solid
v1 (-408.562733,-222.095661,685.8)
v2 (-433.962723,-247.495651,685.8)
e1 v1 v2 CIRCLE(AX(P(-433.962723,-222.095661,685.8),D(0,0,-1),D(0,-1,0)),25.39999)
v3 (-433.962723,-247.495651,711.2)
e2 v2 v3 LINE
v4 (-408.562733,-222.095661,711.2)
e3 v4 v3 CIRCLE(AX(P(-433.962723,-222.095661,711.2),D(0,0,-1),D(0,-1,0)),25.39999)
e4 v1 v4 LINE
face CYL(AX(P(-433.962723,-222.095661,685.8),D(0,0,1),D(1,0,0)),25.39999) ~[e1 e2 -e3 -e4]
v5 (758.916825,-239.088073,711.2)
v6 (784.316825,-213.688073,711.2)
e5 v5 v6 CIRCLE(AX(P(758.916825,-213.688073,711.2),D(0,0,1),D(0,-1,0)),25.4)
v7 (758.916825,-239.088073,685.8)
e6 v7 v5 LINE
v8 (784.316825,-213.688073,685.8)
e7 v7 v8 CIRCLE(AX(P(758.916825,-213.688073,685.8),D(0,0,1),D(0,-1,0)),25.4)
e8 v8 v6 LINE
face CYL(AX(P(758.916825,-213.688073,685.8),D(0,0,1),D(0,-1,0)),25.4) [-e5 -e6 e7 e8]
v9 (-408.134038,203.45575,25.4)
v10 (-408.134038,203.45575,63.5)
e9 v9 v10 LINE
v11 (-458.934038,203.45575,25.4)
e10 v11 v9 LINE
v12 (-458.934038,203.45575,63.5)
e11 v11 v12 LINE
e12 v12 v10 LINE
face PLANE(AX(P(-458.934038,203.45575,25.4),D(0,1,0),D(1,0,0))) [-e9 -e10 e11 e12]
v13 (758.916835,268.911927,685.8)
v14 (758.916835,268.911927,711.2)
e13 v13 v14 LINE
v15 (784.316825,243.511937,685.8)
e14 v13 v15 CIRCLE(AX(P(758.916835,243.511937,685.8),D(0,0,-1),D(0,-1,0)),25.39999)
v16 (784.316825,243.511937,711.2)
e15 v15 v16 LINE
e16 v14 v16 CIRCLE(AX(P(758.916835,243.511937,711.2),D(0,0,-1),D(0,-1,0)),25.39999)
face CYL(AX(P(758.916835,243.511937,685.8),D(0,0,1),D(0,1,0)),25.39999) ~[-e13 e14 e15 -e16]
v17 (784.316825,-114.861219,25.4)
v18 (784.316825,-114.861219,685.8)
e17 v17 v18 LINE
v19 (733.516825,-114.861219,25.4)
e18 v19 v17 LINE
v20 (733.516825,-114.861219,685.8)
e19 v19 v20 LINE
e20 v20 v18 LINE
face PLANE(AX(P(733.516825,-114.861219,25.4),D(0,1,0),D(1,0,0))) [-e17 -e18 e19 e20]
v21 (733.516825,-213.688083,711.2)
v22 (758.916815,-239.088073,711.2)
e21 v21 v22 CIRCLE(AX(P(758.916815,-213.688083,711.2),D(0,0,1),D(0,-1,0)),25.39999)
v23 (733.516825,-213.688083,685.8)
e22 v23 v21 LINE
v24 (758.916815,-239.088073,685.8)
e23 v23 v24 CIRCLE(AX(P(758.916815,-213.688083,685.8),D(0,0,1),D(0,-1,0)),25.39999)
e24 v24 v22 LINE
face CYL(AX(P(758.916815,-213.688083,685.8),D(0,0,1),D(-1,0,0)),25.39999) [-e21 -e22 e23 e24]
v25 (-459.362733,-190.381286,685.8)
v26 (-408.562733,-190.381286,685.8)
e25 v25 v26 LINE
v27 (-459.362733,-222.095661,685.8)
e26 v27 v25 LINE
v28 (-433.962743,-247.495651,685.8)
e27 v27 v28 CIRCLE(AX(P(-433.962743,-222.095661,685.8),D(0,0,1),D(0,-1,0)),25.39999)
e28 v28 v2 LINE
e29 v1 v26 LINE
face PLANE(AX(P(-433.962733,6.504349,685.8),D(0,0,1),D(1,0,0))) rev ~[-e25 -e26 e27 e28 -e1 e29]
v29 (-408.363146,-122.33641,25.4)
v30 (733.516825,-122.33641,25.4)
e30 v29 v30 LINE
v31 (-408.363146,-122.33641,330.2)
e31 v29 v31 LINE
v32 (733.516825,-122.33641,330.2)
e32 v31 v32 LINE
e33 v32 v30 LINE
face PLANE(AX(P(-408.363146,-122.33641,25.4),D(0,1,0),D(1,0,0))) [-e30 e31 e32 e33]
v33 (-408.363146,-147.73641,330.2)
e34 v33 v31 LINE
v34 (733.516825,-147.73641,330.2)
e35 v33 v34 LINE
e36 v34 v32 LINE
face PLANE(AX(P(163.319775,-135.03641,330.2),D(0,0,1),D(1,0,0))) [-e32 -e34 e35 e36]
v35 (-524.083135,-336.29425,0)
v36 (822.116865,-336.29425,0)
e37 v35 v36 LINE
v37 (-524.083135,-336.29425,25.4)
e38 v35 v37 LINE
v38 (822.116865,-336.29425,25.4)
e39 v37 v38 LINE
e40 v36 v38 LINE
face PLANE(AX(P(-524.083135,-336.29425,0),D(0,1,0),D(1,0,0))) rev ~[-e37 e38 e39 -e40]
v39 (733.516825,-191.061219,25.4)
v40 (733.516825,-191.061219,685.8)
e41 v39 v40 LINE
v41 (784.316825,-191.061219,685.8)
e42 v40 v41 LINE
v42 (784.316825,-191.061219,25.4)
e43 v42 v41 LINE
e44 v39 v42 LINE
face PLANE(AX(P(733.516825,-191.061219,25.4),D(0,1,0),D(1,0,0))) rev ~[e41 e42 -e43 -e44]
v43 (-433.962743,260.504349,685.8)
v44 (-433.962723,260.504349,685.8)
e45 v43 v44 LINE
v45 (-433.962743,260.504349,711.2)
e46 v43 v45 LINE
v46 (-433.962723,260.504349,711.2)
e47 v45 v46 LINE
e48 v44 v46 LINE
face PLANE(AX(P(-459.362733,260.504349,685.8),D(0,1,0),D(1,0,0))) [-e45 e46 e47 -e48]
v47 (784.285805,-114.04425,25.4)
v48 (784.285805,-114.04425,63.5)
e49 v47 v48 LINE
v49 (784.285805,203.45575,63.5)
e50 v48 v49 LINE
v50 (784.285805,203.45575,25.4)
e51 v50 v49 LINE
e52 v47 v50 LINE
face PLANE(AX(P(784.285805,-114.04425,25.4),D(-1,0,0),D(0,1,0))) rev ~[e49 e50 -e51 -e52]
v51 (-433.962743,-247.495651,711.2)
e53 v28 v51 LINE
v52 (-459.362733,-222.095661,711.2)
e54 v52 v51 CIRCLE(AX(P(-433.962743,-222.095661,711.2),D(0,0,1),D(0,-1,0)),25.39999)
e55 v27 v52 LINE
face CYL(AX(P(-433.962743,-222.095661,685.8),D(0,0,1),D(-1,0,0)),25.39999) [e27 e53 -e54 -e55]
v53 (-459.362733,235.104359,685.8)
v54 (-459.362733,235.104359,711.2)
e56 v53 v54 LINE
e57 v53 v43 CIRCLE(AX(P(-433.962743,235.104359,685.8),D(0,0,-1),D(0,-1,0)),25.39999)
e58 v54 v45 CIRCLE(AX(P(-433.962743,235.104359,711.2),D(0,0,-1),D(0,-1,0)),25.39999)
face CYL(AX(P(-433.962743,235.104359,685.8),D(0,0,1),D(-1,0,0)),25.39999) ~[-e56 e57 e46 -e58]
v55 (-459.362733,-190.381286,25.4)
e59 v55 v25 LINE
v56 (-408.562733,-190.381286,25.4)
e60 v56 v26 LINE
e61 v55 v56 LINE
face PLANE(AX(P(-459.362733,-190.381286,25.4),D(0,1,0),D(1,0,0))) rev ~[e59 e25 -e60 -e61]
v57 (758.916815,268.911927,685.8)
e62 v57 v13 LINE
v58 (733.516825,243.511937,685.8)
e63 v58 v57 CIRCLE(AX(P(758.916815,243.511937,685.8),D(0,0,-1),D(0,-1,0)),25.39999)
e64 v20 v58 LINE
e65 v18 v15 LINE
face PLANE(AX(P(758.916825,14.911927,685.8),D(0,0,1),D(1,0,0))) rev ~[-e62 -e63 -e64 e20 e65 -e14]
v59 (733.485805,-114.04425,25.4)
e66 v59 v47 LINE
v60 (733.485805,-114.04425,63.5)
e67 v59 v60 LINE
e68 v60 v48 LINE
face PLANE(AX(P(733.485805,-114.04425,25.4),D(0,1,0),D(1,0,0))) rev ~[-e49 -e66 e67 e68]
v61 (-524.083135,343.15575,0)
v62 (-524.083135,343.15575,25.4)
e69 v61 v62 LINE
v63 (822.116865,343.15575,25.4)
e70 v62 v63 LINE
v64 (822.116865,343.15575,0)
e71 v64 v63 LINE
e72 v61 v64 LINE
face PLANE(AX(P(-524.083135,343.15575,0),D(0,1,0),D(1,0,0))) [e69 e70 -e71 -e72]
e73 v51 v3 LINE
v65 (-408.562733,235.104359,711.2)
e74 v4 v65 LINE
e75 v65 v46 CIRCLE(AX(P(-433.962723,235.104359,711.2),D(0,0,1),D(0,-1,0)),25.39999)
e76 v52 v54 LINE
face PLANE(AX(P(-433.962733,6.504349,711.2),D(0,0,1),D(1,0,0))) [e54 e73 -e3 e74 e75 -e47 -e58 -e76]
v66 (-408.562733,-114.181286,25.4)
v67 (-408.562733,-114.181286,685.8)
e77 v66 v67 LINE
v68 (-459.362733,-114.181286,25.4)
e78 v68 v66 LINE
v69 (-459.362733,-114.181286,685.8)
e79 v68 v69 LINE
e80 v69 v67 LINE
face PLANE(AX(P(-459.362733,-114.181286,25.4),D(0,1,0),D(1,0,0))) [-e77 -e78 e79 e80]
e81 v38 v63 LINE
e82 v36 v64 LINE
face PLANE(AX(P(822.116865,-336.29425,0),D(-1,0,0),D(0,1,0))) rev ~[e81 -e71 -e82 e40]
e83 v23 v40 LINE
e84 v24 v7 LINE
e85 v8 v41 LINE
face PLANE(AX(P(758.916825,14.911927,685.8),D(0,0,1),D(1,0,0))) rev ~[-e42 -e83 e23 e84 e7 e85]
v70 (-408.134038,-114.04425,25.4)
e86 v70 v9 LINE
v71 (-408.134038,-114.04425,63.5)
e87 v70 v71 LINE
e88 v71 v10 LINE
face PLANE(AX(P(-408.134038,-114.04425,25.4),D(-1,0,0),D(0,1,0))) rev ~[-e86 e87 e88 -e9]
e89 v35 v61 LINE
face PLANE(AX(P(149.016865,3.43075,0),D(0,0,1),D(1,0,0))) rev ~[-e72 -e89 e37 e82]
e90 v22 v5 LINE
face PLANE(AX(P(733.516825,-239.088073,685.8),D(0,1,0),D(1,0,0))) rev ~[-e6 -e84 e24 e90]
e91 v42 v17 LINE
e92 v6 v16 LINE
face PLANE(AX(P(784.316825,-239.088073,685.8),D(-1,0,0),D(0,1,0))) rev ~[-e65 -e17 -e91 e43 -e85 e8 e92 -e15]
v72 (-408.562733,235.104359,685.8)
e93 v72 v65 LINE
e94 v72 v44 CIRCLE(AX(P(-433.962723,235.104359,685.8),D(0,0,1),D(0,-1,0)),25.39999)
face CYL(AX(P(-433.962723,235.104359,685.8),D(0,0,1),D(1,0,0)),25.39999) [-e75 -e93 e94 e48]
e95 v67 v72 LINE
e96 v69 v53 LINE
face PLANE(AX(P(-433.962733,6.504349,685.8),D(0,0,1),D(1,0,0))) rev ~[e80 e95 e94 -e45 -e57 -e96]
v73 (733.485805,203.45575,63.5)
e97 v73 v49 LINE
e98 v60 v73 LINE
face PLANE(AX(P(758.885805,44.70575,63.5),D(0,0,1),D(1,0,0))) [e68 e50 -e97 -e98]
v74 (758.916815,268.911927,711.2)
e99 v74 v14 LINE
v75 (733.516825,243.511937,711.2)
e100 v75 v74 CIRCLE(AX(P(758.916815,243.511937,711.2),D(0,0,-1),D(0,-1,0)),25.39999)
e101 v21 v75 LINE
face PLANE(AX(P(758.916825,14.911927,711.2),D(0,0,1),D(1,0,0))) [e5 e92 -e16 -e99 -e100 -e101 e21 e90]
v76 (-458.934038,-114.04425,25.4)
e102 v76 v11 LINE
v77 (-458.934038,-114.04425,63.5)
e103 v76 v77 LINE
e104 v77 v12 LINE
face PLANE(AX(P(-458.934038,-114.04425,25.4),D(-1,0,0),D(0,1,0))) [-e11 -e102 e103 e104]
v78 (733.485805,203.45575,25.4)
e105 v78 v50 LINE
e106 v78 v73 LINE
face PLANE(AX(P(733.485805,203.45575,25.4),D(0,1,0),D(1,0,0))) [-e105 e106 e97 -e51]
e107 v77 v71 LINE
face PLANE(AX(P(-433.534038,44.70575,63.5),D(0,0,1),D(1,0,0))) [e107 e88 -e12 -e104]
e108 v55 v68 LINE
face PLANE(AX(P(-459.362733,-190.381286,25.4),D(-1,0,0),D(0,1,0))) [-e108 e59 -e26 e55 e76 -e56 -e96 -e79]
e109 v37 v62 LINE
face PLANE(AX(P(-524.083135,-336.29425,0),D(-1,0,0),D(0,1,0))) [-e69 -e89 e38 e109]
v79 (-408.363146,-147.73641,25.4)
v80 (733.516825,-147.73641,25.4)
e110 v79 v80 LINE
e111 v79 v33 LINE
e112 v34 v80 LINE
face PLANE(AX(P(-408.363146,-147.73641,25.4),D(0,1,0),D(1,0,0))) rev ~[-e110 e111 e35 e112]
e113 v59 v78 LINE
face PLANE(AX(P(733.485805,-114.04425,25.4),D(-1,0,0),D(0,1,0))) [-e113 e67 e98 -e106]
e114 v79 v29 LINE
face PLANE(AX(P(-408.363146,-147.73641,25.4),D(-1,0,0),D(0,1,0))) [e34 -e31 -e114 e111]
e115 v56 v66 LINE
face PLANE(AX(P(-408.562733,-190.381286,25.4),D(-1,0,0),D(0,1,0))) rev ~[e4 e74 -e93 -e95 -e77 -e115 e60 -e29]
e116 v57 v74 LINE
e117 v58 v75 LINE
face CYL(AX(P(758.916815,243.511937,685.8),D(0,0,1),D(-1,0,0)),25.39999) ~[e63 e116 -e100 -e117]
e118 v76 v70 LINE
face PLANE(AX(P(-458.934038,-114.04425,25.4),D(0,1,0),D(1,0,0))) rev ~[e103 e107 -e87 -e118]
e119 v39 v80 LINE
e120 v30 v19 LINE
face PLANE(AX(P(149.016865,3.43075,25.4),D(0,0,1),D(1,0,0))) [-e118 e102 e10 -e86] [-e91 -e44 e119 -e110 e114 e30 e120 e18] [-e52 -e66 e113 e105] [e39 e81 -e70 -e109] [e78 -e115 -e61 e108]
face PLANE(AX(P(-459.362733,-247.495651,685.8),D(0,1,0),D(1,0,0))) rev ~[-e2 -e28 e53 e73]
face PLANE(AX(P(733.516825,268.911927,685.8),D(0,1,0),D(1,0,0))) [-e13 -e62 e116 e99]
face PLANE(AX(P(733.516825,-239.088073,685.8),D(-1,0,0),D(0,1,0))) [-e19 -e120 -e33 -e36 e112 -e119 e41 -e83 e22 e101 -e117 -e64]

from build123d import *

# Parameters (mm, degrees)
F0_W      = 1346.2
F0_H      = 679.45
F1_DEPTH  = 25.4
F3_W      = 50.8
F3_H      = 317.5
F4_W      = 50.8
F4_H      = 317.5
F5_DEPTH  = 38.1
F7_W      = 50.8
F7_H      = 76.2
F6_W      = 50.8
F6_H      = 76.2
F8_DEPTH  = 660.4
F10_W     = 50.8
F10_H     = 508
F9_W      = 50.8
F9_H      = 508
F11_DEPTH = 25.4
F12_R     = 25.39999
F13_R     = 25.4
F14_W     = 1143.3658423165
F14_H     = 25.4
F15_DEPTH = 304.8


# Not quite as in the source:
# - a fillet or chamfer is up to 0.001 mm smaller than in the source, because OpenCascade refuses the exact size


with BuildPart() as f1:
    # F0 (on Top) → F1 (new body)
    with BuildSketch(Plane.XY):
        with Locations((149.0168645364, 3.430750221)):
            Rectangle(F0_W, F0_H)
    extrude(amount=F1_DEPTH)

    # F3 (on face) + F4 (on face) → F5 (join)
    with BuildSketch(Plane.XY.offset(25.4)):
        with Locations((-433.5340384189, 44.705750221)):
            Rectangle(F3_W, F3_H)
    with BuildSketch(Plane.XY.offset(25.4)):
        with Locations((758.8858046625, 44.705750221)):
            Rectangle(F4_W, F4_H)
    extrude(amount=F5_DEPTH)

    # F7 (on face) + F6 (on face) → F8 (join)
    with BuildSketch(Plane.XY.offset(25.4)):
        with Locations((-433.9627325535, -152.2812862285)):
            Rectangle(F7_W, F7_H)
    with BuildSketch(Plane.XY.offset(25.4)):
        with Locations((758.9168250561, -152.9612190686)):
            Rectangle(F6_W, F6_H)
    extrude(amount=F8_DEPTH)

    # F10 (on face) + F9 (on face) → F11 (join)
    with BuildSketch(Plane.XY.offset(685.8)):
        with Locations((758.9168250561, 14.9119266272)):
            Rectangle(F10_W, F10_H)
    with BuildSketch(Plane.XY.offset(685.8)):
        with Locations((-433.9627325535, 6.5043487549)):
            Rectangle(F9_W, F9_H)
    extrude(amount=F11_DEPTH)

    # F12 (radius 25.4 in the source; OpenCascade refuses exactly that, so slightly less here)
    f12_edges = [f1.edges().sort_by_distance(p)[0] for p in [
        (-459.362733, 260.504349, 698.5),
        (-408.562733, 260.504349, 698.5),
        (733.516825, 268.911927, 698.5),
        (784.316825, 268.911927, 698.5),
        (-459.362733, -247.495651, 698.5),
        (-408.562733, -247.495651, 698.5),
        (733.516825, -239.088073, 698.5),
    ]]
    fillet(f12_edges, radius=F12_R)

    # F13
    f13_edges = [f1.edges().sort_by_distance(p)[0] for p in [
        (784.316825, -239.088073, 698.5),
    ]]
    fillet(f13_edges, radius=F13_R)

    # F14 (on face) → F15 (join)
    with BuildSketch(Plane.XY.offset(25.4)):
        with Locations((163.3197753559, -135.036409986)):
            Rectangle(F14_W, F14_H)
    extrude(amount=F15_DEPTH)


solid = f1.part
